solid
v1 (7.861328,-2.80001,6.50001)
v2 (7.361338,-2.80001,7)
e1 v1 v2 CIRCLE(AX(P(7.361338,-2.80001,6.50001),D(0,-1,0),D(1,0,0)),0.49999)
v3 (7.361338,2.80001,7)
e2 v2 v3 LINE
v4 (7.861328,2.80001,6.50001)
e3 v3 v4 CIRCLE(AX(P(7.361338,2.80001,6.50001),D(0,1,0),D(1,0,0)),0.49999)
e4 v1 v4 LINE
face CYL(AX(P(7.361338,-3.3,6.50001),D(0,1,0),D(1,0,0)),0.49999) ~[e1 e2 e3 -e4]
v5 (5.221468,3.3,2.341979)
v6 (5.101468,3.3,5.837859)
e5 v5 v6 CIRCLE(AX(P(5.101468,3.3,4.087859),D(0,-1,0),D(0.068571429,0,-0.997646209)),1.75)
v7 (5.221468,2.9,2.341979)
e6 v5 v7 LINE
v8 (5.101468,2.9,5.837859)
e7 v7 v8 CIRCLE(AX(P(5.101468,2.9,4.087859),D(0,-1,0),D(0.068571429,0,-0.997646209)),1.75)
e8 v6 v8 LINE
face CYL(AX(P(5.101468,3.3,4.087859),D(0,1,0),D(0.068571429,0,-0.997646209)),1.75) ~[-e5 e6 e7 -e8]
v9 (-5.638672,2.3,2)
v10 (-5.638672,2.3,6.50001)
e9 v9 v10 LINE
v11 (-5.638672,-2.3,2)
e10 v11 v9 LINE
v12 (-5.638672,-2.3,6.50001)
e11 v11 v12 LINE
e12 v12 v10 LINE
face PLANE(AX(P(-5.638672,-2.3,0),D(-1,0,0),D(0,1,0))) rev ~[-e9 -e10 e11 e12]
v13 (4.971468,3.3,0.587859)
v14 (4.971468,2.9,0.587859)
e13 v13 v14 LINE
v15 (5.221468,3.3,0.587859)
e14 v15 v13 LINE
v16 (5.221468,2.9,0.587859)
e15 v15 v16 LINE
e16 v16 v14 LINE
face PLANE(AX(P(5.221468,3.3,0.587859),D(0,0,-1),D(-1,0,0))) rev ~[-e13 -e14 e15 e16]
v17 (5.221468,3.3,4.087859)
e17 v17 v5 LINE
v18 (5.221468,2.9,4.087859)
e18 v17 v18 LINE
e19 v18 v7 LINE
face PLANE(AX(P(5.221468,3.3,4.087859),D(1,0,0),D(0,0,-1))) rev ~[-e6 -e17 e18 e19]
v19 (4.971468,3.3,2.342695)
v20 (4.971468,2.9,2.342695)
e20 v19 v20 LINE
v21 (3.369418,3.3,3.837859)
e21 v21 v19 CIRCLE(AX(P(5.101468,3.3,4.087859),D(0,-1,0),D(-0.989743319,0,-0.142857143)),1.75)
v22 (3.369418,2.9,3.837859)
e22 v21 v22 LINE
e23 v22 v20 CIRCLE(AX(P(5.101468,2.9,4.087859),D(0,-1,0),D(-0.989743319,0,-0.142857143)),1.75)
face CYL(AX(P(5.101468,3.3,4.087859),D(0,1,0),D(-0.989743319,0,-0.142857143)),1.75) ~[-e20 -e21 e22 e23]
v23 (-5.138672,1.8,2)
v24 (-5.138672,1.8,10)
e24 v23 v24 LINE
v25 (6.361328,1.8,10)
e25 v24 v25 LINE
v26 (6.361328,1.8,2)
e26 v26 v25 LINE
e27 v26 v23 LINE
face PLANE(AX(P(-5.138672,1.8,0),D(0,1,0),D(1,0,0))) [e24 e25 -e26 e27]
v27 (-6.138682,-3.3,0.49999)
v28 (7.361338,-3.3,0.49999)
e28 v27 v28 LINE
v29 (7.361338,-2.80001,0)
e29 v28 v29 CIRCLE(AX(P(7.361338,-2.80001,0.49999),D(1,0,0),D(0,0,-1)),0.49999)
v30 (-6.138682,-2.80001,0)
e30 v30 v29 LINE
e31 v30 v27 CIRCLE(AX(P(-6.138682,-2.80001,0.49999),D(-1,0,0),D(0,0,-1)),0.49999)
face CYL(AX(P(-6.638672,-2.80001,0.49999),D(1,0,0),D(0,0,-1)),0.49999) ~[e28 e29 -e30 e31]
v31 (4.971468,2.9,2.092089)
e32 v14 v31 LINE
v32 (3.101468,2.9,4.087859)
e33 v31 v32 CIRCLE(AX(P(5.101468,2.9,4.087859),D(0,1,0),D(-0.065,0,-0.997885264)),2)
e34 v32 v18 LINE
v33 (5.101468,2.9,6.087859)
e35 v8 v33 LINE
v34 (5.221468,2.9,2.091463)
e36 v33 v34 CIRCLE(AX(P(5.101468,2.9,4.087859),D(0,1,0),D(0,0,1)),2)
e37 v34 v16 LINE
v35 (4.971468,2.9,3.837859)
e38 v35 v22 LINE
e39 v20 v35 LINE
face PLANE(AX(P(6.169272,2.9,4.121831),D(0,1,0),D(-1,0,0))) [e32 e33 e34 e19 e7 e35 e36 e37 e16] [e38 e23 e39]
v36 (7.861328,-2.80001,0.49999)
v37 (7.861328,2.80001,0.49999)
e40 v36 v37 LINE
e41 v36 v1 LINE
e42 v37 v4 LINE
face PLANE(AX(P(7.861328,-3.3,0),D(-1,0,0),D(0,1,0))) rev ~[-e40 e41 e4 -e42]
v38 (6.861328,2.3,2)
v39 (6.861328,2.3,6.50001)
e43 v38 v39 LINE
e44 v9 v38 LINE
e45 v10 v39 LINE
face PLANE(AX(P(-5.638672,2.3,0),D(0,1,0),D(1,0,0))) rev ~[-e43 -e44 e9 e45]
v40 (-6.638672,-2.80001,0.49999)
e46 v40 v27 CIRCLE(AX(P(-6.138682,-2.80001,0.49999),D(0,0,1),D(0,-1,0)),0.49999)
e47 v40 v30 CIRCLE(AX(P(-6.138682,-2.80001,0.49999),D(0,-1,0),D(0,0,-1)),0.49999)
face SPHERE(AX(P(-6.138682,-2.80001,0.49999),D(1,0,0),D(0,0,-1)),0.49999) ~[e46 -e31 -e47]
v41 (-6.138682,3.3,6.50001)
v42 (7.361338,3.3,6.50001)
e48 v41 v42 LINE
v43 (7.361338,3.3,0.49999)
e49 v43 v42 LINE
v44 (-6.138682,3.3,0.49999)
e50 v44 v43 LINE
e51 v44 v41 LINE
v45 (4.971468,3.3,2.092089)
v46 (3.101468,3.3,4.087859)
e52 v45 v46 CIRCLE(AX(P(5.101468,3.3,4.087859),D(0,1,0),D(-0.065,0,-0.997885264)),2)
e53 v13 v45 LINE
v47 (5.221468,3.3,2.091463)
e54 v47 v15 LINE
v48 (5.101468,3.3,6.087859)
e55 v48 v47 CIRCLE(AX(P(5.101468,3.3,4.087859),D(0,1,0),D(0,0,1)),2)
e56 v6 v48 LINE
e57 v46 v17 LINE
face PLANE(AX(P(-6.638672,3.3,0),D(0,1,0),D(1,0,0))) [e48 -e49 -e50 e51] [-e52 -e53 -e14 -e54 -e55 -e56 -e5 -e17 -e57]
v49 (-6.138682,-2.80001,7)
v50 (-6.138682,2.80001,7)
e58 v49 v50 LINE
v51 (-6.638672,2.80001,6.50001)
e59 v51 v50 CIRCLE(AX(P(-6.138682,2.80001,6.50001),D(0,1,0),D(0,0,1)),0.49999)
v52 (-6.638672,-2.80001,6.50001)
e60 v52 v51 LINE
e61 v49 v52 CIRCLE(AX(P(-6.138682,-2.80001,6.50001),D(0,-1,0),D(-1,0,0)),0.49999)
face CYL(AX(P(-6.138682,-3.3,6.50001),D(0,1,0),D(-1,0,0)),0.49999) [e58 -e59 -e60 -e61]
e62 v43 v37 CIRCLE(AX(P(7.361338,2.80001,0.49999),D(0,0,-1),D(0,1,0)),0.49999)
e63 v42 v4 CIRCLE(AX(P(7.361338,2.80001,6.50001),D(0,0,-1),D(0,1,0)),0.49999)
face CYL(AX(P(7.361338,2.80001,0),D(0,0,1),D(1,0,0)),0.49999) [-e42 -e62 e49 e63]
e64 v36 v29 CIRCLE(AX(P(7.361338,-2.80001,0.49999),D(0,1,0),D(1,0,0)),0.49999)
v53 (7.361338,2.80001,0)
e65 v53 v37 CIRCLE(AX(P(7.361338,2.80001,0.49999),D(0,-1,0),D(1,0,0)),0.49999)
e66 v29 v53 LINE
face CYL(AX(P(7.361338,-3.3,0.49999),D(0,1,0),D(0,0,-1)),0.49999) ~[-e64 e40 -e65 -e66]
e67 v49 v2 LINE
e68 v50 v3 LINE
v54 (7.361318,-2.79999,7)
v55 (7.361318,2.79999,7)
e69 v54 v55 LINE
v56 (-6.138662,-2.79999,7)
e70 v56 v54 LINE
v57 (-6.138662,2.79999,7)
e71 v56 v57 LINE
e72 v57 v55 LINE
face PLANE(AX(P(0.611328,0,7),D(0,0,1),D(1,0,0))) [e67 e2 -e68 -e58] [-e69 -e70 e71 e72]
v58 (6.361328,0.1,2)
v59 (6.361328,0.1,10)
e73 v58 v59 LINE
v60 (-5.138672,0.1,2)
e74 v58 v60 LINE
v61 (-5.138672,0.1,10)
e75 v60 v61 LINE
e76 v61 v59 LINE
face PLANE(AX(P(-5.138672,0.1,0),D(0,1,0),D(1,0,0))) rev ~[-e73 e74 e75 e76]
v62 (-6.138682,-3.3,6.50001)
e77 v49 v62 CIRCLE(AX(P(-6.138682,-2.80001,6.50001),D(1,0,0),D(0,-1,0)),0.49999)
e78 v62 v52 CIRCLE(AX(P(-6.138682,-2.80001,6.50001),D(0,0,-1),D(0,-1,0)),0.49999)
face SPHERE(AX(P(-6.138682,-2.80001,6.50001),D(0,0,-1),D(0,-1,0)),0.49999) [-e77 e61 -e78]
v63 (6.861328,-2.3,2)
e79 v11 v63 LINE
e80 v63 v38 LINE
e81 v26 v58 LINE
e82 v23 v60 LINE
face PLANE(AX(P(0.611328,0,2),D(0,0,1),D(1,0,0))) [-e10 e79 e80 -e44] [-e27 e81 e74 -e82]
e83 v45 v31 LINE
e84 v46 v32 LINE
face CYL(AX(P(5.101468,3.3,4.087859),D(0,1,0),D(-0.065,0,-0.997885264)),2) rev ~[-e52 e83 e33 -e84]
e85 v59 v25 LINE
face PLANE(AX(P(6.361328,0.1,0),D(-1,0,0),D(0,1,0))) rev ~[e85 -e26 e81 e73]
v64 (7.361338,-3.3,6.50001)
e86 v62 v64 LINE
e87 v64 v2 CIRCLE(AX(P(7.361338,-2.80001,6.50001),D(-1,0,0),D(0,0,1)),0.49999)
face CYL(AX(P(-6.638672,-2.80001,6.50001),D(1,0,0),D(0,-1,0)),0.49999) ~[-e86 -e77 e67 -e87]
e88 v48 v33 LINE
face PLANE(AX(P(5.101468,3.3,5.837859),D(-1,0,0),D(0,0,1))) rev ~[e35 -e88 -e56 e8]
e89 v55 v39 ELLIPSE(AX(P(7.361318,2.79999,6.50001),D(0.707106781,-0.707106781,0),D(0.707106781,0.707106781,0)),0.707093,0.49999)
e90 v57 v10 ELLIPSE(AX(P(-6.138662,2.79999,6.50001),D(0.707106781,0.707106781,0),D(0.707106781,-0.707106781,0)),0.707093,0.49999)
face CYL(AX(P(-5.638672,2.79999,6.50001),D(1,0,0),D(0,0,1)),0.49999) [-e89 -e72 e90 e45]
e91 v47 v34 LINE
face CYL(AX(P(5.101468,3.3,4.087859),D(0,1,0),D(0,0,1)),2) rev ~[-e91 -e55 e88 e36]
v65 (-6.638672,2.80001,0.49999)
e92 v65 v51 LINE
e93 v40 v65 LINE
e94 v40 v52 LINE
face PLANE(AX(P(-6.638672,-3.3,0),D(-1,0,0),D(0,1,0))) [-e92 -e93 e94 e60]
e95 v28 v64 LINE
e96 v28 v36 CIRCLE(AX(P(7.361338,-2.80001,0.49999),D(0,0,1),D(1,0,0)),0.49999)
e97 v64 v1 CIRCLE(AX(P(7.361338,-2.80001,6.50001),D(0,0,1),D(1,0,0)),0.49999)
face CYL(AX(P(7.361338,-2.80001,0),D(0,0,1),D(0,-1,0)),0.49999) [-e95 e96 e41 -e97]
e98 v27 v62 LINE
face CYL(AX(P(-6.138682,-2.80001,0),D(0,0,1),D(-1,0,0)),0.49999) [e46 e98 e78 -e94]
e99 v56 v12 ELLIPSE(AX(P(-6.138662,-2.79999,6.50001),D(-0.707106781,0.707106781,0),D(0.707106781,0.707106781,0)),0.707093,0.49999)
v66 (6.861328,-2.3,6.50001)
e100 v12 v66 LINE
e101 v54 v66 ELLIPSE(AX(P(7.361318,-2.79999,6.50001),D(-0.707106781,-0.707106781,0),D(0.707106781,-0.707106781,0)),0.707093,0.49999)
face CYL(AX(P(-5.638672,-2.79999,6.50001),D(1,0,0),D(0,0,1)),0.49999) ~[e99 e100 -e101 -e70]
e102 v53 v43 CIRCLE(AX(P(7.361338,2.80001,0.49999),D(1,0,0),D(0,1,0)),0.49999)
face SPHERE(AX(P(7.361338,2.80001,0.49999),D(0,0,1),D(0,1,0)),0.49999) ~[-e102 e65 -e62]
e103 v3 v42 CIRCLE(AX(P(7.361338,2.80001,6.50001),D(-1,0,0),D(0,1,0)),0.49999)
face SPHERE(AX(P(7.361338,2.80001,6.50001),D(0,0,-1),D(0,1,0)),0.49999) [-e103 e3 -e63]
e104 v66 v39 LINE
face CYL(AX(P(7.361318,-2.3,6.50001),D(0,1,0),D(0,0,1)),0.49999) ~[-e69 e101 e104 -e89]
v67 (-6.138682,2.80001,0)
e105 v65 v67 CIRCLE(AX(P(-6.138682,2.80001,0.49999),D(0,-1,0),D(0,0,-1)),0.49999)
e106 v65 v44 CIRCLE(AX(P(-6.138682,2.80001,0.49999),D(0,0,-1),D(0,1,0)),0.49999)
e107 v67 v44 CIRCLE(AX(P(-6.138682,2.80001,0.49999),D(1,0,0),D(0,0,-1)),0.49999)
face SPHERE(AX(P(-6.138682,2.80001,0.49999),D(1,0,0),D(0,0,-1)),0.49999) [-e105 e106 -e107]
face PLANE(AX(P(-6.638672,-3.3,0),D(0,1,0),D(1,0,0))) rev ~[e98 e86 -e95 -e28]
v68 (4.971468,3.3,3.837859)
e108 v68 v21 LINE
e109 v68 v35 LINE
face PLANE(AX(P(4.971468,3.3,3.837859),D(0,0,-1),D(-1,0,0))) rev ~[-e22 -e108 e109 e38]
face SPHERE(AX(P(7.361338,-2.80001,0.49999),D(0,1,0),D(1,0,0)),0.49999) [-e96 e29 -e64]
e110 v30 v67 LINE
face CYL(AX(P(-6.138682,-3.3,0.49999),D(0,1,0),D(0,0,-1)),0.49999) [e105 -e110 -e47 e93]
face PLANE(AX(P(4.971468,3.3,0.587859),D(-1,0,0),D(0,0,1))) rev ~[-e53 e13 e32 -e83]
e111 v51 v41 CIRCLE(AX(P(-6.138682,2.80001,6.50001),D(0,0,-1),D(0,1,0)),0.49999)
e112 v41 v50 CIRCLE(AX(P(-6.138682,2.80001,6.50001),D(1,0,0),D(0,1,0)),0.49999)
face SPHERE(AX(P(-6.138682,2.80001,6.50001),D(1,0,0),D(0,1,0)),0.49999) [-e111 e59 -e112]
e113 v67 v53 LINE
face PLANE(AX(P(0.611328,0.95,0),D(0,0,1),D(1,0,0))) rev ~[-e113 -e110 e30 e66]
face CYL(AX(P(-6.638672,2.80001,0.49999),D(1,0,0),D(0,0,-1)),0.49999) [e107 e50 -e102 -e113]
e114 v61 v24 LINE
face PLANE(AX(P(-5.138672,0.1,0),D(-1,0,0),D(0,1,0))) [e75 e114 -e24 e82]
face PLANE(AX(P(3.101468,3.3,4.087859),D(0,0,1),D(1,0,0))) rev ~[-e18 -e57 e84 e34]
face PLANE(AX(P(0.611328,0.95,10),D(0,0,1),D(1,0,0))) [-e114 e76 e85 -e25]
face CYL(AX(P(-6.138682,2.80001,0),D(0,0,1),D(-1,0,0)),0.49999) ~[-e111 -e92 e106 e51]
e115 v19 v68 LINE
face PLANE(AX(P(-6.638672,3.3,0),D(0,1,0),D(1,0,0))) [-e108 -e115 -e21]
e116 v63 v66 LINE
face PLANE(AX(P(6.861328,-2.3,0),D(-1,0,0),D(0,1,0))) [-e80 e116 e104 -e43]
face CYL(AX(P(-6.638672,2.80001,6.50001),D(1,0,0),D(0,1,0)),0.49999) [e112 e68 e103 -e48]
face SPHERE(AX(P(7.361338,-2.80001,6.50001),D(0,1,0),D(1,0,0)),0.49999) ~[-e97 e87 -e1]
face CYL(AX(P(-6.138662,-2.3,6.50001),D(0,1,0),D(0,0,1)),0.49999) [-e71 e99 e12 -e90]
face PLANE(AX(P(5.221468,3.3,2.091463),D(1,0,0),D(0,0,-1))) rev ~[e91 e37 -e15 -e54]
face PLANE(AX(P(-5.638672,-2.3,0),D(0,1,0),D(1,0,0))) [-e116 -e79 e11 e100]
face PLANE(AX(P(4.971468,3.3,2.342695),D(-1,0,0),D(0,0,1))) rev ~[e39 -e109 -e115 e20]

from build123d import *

# Parameters (mm, degrees)
F0_W     = 14.5
F0_H     = 6.6
F0_W_2   = 12.5
F0_H_2   = 4.6
F1_DEPTH = 7
F0_W_3   = 11.5
F0_H_3   = 1.7
F2_DEPTH = 2
F3_DEPTH = 10
F5_DEPTH = 0.4
F6_R     = 0.49999


# Not quite as in the source:
# - a fillet or chamfer is up to 0.001 mm smaller than in the source, because OpenCascade refuses the exact size


with BuildPart() as f1:
    # F0 (on Top) → F1 (new body)
    with BuildSketch(Plane.XY):
        with Locations((0.6113282288, 0)):
            Rectangle(F0_W, F0_H)
        with Locations((0.6113282288, 0)):
            Rectangle(F0_W_2, F0_H_2, mode=Mode.SUBTRACT)
    extrude(amount=F1_DEPTH)

    # F0 (on Top) → F2 (join)
    with BuildSketch(Plane.XY):
        with Locations((0.6113282288, 0)):
            Rectangle(F0_W_2, F0_H_2)
        with Locations((0.6113282288, 0.95)):
            Rectangle(F0_W_3, F0_H_3, mode=Mode.SUBTRACT)
        with Locations((0.6113282288, 0.95)):
            Rectangle(F0_W_3, F0_H_3)
    extrude(amount=F2_DEPTH)

    # F0 (on Top) → F3 (join)
    with BuildSketch(Plane.XY):
        with Locations((0.6113282288, 0.95)):
            Rectangle(F0_W_3, F0_H_3)
    extrude(amount=F3_DEPTH)

    # F4 (on face) → F5 (cut)
    with BuildSketch(Plane(origin=(0, 3.3, 0), x_dir=(-1, 0, 0), z_dir=(0, 1, 0))):
        with BuildLine():
            Line((-5.1014683965, 5.8378594238), (-5.1014683965, 6.0878594238))
            ThreePointArc((-5.1014683965, 6.0878594238), (-7.1005673821, 4.1478864664), (-5.2214683965, 2.0914626697))
            Line((-5.2214683965, 2.0914626697), (-5.2214683965, 2.3419785573))
            ThreePointArc((-5.2214683965, 2.3419785573), (-6.8504383099, 4.1478947619), (-5.1014683965, 5.8378594238))
        make_face()
        with BuildLine():
            Line((-5.2214683965, 2.3419785573), (-5.2214683965, 2.0914626697))
            ThreePointArc((-5.2214683965, 2.0914626697), (-5.0964586021, 2.0878656984), (-4.9714683965, 2.0920888959))
            Line((-4.9714683965, 2.0920888959), (-4.9714683965, 2.3426946752))
            ThreePointArc((-4.9714683965, 2.3426946752), (-5.0964555923, 2.3378666033), (-5.2214683965, 2.3419785573))
        make_face()
        with BuildLine():
            ThreePointArc((-4.9714683965, 2.0920888959), (-5.0964586021, 2.0878656984), (-5.2214683965, 2.0914626697))
            Line((-5.2214683965, 2.0914626697), (-5.2214683965, 0.5878594238))
            Line((-5.2214683965, 0.5878594238), (-4.9714683965, 0.5878594238))
            Line((-4.9714683965, 0.5878594238), (-4.9714683965, 2.0920888959))
        make_face()
        with BuildLine():
            Line((-4.9714683965, 2.3426946752), (-4.9714683965, 2.0920888959))
            ThreePointArc((-4.9714683965, 2.0920888959), (-3.6420164446, 2.7203799907), (-3.1014683965, 4.0878594238))
            Line((-3.1014683965, 4.0878594238), (-3.3514683965, 4.0878594238))
            ThreePointArc((-3.3514683965, 4.0878594238), (-3.3559614625, 3.9625376644), (-3.3694175889, 3.8378594238))
            ThreePointArc((-3.3694175889, 3.8378594238), (-3.907446743, 2.8084797729), (-4.9714683965, 2.3426946752))
        make_face()
        with BuildLine():
            Line((-5.2214683965, 4.0878594238), (-5.2214683965, 2.3419785573))
            ThreePointArc((-5.2214683965, 2.3419785573), (-5.0964555923, 2.3378666033), (-4.9714683965, 2.3426946752))
            Line((-4.9714683965, 2.3426946752), (-4.9714683965, 3.8378594238))
            Line((-4.9714683965, 3.8378594238), (-3.3694175889, 3.8378594238))
            ThreePointArc((-3.3694175889, 3.8378594238), (-3.3559614625, 3.9625376644), (-3.3514683965, 4.0878594238))
            Line((-3.3514683965, 4.0878594238), (-5.2214683965, 4.0878594238))
        make_face()
    extrude(amount=-F5_DEPTH, mode=Mode.SUBTRACT)

    # F6 (radius 0.5 in the source; OpenCascade refuses exactly that, so slightly less here)
    f6_edges = [f1.edges().sort_by_distance(p)[0] for p in [
        (7.861328, 3.3, 3.5),
        (0.611328, 3.3, 7),
        (0.611328, 3.3, 0),
        (7.861328, 0, 0),
        (7.861328, 0, 7),
        (7.861328, -3.3, 3.5),
        (0.611328, -3.3, 0),
        (-6.638672, 0, 0),
        (-6.638672, 3.3, 3.5),
        (-6.638672, -3.3, 3.5),
        (0.611328, -3.3, 7),
        (-6.638672, 0, 7),
        (0.611328, 2.3, 7),
        (0.611328, -2.3, 7),
        (-5.638672, 0, 7),
        (6.861328, 0, 7),
    ]]
    fillet(f6_edges, radius=F6_R)


solid = f1.part
